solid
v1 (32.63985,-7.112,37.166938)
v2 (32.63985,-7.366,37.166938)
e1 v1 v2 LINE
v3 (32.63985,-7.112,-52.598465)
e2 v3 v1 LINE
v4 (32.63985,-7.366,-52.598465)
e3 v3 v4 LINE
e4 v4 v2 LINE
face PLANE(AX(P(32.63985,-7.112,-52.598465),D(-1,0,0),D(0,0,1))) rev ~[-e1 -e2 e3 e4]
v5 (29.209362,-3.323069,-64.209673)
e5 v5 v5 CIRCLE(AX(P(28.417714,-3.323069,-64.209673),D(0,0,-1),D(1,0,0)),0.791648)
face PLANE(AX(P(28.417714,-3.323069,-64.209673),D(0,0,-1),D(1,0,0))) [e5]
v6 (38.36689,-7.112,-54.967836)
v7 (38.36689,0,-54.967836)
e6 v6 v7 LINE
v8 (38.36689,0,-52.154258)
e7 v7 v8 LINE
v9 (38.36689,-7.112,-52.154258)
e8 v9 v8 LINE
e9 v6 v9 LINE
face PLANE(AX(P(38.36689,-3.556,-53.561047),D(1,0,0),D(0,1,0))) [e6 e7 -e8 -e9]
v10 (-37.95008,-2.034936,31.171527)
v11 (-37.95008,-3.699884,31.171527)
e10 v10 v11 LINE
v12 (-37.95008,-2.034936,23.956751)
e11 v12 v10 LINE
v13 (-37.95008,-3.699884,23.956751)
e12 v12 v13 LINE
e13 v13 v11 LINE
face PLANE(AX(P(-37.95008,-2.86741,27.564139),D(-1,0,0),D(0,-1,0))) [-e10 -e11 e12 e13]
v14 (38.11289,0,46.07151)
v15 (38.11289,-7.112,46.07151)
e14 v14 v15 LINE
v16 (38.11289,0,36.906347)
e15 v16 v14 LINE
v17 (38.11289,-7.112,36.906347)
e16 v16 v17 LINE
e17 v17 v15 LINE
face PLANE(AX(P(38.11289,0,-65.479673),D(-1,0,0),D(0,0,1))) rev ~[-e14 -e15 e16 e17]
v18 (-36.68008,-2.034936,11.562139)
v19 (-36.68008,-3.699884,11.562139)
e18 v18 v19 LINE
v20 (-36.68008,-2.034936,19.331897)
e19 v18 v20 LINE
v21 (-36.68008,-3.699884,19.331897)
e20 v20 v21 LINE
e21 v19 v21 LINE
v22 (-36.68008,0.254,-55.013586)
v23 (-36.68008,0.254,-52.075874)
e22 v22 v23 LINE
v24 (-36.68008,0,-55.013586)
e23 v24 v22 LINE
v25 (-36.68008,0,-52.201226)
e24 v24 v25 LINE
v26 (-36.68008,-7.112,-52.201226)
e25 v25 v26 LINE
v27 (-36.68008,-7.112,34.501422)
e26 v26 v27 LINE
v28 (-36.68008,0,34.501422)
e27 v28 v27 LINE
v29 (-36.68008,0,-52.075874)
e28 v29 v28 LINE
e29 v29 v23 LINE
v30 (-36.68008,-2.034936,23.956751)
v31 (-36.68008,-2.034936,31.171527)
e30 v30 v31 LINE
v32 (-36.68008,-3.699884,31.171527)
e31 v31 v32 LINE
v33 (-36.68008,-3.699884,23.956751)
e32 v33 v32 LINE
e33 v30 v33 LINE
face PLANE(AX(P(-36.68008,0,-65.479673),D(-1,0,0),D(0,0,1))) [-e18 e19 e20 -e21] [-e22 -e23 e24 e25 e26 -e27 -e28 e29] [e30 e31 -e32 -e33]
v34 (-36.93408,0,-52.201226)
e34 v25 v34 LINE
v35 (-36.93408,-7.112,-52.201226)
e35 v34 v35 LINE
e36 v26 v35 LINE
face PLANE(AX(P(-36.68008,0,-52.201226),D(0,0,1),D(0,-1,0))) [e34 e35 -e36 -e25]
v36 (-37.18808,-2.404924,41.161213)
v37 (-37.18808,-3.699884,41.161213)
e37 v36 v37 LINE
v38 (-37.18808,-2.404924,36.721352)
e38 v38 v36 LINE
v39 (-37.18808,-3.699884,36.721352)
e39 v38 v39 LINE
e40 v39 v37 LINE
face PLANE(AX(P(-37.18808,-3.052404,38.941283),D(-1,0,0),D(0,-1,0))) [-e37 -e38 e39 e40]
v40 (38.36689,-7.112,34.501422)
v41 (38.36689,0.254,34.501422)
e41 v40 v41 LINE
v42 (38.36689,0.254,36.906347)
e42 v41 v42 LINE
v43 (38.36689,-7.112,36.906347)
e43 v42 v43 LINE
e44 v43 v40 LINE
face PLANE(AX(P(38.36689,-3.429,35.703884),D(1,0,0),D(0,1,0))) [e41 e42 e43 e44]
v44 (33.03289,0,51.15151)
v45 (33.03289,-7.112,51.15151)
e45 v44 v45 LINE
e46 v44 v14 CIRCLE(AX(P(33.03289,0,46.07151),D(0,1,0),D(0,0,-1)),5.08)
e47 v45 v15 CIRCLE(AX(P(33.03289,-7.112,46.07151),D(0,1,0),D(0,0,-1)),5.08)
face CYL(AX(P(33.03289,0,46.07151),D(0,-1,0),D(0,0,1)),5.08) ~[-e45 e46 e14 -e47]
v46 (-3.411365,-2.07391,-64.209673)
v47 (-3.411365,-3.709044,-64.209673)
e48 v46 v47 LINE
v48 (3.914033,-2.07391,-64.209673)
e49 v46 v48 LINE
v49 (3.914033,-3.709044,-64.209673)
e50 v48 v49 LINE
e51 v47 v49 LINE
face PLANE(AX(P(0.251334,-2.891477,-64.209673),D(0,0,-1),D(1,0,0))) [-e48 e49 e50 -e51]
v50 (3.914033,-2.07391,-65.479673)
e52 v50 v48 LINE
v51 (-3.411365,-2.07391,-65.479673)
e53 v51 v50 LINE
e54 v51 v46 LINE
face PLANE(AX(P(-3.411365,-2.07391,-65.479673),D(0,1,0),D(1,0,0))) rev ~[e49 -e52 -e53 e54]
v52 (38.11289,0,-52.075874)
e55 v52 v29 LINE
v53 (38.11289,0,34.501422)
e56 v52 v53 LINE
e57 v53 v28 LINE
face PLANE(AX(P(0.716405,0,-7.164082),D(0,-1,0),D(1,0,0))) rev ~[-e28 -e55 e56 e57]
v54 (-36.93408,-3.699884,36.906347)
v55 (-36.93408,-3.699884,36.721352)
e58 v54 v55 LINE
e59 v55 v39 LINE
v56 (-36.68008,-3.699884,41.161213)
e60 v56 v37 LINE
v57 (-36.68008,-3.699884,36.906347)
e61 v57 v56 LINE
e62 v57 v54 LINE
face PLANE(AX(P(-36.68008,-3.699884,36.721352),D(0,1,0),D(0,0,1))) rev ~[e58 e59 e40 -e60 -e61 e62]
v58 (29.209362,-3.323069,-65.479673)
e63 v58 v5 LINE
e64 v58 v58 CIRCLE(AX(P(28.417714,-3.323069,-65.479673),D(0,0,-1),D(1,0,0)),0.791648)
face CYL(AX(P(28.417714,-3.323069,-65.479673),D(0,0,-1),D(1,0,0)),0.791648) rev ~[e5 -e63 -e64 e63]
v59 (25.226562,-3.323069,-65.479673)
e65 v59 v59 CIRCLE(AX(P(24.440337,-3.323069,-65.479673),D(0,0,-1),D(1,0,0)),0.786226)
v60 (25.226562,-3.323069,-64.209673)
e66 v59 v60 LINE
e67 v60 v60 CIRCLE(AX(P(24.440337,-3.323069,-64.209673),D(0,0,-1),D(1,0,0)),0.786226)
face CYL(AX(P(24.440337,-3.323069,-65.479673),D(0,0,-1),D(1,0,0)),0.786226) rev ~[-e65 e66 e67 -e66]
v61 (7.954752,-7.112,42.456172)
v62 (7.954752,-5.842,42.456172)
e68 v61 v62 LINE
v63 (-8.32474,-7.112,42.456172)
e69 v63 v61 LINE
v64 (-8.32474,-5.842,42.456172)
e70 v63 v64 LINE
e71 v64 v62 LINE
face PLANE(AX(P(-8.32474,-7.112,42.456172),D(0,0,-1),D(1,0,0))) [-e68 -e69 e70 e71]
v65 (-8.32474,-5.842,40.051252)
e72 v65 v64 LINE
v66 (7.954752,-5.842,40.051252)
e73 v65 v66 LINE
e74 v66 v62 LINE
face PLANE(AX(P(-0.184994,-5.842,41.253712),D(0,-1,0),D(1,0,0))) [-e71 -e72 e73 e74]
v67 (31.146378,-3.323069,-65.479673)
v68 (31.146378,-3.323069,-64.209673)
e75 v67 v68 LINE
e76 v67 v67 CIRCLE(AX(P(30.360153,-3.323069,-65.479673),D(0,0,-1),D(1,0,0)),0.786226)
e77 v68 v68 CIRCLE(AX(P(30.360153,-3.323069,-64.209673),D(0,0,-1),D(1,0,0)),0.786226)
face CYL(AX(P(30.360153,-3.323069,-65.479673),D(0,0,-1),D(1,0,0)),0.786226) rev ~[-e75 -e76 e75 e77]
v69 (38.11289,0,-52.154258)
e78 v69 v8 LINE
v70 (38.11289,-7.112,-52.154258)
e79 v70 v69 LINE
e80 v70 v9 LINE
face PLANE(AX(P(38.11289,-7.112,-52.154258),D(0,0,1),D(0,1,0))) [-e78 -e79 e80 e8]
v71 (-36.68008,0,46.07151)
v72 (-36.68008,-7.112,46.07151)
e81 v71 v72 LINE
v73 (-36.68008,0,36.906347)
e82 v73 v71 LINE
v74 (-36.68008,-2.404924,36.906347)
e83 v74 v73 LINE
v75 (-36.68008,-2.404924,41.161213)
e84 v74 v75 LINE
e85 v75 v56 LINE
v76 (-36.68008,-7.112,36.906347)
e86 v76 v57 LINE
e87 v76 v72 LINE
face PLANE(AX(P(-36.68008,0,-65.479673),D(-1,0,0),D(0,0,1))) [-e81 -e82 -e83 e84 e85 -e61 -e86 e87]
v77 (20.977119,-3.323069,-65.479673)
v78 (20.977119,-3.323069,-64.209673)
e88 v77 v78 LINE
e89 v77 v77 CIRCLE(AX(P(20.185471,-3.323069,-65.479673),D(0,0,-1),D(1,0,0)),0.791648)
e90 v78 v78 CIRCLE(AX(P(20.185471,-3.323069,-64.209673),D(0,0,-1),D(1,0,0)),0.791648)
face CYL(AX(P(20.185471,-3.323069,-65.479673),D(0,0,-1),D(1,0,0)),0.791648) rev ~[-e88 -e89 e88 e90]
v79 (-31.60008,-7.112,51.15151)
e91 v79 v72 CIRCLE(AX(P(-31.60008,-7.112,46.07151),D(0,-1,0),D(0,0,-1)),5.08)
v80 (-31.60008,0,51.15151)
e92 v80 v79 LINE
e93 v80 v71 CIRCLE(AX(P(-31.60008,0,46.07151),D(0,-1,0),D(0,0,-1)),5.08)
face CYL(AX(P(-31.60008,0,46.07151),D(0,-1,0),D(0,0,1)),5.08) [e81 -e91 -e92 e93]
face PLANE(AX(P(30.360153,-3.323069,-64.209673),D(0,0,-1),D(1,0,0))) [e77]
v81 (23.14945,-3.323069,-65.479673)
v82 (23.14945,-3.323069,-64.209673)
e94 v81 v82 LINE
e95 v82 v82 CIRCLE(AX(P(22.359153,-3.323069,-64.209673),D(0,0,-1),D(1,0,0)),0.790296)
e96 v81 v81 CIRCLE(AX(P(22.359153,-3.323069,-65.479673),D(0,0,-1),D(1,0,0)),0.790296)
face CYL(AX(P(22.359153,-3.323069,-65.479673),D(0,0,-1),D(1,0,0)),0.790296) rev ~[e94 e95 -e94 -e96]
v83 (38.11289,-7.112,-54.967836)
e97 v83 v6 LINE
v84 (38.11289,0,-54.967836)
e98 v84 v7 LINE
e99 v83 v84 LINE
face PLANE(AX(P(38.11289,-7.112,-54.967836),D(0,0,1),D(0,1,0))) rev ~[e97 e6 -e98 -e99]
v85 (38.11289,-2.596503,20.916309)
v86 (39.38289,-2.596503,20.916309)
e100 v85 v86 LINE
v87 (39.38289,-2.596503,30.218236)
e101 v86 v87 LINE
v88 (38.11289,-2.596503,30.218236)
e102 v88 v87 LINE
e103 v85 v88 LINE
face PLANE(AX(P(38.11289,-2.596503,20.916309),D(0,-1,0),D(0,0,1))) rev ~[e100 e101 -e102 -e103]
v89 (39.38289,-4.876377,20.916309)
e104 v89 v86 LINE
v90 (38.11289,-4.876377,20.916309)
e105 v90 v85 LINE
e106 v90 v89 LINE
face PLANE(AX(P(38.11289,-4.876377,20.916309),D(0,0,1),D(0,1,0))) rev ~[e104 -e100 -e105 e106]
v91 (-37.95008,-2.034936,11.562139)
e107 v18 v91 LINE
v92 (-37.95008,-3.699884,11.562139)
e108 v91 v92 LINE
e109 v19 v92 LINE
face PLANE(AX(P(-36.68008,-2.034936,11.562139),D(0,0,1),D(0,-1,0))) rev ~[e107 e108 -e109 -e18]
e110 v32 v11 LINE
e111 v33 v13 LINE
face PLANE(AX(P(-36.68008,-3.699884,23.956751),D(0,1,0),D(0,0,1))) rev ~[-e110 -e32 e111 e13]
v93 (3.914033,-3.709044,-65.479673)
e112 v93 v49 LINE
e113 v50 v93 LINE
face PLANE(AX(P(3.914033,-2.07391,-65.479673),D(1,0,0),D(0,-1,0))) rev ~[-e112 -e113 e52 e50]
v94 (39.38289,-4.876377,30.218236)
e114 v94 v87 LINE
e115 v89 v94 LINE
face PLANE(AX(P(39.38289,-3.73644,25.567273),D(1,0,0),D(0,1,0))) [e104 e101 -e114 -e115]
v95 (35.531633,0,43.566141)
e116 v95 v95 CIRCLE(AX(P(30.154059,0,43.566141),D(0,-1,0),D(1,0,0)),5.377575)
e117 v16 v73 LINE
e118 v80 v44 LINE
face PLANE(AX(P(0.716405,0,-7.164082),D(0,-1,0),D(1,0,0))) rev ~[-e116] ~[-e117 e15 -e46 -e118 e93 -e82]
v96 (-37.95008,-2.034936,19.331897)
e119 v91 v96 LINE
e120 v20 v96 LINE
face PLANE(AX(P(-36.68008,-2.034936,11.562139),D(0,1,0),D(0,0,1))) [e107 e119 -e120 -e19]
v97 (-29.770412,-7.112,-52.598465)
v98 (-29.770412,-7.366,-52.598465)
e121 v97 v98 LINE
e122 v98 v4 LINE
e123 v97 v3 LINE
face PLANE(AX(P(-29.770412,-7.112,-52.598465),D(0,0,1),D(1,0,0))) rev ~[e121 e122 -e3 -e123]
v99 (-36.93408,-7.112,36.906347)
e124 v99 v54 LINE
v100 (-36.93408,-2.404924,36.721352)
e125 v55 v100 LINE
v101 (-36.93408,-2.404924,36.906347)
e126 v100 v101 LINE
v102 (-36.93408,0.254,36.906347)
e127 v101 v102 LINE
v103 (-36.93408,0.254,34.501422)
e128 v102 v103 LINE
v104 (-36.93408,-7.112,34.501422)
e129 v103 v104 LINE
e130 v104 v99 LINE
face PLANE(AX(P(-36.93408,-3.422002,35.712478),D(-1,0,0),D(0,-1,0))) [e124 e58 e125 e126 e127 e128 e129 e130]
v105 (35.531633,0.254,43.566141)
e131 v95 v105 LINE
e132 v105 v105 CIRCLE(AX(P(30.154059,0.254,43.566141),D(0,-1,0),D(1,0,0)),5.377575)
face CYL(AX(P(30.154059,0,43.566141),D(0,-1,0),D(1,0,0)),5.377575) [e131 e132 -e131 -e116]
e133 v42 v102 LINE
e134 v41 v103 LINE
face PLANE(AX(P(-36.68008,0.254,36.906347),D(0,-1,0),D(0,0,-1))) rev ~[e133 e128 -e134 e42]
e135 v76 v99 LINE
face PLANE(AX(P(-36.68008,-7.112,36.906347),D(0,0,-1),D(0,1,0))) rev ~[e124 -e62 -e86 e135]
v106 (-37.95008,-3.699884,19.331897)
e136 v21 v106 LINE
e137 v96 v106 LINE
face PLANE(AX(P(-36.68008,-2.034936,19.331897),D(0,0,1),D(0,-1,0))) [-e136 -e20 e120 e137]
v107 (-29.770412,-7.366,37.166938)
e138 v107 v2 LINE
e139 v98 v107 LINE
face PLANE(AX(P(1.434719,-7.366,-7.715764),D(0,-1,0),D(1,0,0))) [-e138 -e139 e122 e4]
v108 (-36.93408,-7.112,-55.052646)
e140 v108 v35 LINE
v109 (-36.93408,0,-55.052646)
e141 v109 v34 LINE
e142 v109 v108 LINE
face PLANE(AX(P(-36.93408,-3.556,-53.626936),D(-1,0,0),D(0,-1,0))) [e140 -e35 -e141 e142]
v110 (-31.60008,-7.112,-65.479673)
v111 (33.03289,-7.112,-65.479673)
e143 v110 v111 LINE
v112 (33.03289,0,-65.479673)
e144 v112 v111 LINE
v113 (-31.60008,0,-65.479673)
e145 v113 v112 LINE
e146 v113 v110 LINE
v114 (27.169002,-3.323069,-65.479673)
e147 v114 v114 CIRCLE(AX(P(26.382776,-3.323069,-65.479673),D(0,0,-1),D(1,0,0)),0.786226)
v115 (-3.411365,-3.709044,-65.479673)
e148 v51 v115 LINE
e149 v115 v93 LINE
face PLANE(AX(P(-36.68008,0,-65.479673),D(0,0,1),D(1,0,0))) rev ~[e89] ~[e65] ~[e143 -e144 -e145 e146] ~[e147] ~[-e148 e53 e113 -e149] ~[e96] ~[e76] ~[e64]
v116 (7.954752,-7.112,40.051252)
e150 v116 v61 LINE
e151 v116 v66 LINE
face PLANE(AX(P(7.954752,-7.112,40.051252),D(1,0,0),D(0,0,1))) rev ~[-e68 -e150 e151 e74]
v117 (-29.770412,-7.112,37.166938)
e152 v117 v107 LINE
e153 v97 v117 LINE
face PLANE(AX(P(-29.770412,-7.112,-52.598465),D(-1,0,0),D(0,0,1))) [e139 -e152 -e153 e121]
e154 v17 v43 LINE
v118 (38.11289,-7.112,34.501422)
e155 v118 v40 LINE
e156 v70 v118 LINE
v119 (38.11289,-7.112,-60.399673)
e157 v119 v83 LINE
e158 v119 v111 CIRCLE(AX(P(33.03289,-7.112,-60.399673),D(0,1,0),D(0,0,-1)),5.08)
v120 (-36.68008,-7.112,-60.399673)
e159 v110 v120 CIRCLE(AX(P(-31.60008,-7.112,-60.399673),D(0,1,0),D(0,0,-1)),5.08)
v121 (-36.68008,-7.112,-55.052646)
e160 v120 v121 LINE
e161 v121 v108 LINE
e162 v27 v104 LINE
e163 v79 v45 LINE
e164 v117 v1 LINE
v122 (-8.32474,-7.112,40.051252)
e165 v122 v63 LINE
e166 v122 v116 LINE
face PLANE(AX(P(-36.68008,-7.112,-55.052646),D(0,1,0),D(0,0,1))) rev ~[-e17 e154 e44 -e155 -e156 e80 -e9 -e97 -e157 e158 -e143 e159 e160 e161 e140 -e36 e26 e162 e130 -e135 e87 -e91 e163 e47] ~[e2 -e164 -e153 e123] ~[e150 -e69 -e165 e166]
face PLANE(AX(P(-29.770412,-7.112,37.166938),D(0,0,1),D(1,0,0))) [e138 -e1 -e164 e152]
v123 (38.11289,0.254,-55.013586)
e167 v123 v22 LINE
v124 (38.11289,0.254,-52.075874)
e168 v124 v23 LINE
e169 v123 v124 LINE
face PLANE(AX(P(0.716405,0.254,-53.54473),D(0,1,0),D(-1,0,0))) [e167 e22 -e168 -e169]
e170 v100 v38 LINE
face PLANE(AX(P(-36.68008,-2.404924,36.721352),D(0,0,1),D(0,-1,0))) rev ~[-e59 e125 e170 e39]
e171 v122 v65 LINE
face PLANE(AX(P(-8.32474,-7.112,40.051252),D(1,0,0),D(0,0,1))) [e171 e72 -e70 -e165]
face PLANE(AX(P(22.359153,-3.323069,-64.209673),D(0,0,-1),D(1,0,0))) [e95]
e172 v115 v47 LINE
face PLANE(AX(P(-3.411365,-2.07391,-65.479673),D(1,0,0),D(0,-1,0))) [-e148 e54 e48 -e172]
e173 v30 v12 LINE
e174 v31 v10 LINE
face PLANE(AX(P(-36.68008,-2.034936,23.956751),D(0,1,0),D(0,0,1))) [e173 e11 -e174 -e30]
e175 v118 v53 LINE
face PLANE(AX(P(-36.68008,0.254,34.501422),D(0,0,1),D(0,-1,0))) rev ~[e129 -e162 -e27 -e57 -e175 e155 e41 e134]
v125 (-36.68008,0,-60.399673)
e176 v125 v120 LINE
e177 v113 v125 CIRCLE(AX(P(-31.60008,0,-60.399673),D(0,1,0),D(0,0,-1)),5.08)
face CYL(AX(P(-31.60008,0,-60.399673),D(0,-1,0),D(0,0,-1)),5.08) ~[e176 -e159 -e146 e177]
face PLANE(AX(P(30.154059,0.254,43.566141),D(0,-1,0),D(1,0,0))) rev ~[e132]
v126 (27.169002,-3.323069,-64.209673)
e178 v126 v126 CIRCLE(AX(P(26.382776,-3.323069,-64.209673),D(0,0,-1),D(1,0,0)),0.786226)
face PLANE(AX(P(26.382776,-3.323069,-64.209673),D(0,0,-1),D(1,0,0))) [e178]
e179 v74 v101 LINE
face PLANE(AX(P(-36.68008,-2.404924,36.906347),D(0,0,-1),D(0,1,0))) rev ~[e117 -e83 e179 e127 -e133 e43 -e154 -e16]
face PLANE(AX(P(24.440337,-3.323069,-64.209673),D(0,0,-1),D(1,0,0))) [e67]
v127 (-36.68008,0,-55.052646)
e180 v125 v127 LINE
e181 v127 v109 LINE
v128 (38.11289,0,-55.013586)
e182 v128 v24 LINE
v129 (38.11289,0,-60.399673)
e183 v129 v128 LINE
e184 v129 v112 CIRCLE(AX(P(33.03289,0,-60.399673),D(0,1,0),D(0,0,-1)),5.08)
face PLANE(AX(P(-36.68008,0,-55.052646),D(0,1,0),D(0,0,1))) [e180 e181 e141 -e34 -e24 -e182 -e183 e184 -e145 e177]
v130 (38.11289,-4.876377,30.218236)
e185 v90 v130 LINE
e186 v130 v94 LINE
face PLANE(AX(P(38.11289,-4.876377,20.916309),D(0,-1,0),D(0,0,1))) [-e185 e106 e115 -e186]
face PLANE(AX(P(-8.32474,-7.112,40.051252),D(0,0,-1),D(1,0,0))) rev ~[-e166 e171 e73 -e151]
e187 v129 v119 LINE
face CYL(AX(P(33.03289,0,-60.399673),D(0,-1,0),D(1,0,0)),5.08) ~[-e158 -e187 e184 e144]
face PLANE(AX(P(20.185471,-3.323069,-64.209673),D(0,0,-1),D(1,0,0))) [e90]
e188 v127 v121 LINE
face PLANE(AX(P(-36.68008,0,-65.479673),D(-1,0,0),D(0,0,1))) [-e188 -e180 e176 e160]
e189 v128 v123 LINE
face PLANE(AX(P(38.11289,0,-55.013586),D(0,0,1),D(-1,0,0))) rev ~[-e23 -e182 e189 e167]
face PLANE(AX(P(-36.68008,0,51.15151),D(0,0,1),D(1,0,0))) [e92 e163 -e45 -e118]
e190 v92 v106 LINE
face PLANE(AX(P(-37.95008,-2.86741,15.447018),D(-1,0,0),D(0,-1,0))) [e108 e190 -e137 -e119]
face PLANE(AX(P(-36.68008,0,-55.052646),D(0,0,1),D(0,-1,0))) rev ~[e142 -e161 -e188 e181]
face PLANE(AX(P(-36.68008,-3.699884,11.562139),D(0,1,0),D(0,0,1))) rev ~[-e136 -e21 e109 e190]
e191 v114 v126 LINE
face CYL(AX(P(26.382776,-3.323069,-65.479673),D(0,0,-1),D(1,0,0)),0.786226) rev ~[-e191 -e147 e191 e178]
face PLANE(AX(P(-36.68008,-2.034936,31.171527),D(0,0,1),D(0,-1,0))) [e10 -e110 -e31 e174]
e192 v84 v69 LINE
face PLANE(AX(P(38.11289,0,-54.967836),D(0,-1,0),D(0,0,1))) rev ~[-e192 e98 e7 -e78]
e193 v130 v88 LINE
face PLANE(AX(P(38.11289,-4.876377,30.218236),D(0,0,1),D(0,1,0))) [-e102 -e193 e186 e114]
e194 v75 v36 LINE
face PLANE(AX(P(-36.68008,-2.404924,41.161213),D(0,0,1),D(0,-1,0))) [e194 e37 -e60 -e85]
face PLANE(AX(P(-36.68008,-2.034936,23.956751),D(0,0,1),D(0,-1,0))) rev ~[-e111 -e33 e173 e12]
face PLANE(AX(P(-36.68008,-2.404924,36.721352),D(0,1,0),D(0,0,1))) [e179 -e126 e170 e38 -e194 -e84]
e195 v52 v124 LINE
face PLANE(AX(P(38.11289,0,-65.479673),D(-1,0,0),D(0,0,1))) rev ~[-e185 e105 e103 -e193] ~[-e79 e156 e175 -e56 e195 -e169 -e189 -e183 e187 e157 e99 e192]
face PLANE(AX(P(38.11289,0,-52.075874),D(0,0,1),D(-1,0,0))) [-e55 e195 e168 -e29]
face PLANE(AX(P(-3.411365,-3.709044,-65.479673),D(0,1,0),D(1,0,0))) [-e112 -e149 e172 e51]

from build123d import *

# Parameters (mm, degrees)
F0_W      = 74.7929699719
F0_H      = 116.6311837733
F1_DEPTH  = 7.112
F2_W      = 2.2798741702
F2_H      = 9.3019269407
F3_DEPTH  = 1.27
F4_W      = 1.6649477184
F4_H      = 7.7697578818
F5_DEPTH  = 1.27
F4_H_2    = 7.214775309
F6_DEPTH  = 1.27
F4_W_2    = 1.2949595693
F4_H_3    = 4.4398605824
F7_DEPTH  = 0.508
F10_W     = 16.2794925272
F10_H     = 2.4049207568
F11_DEPTH = 1.27
F14_R     = 5.08
F15_R     = 5.08
F16_W     = 62.410261482
F16_H     = 89.7654034197
F17_DEPTH = 0.254
F21_R     = 5.3775746227
F22_DEPTH = 0.254
F25_W     = 74.7929699719
F25_H     = 2.4049244821
F26_DEPTH = 0.254
F29_DEPTH = 0.254
F30_DEPTH = 0.254
F31_W     = 74.7929699719
F31_H     = 2.9377117753
F34_DEPTH = 0.254
F32_W     = 7.112
F32_H     = 2.813577652
F35_DEPTH = 0.254
F33_W     = 7.112
F33_H     = 2.8514191508
F36_DEPTH = 0.254
F8_R      = 0.7916480681
F39_DEPTH = 1.27
F9_R      = 0.7862255443
F9_R_2    = 0.7916480681
F9_R_3    = 0.7862255169
F9_R_4    = 0.7902964021
F40_DEPTH = 1.27
F41_W     = 7.3253975715
F41_H     = 1.6351337545
F42_DEPTH = 1.27


# Not quite as in the source:
# - the program builds the solid bodies; features that only make, move or delete a surface that nothing else refers to are left out


with BuildPart() as f1:
    # F0 (on Front) → F1 (new body)
    with BuildSketch(Plane.XZ):
        with Locations((0.7164049894, -7.1640815586)):
            Rectangle(F0_W, F0_H)
    extrude(amount=F1_DEPTH)

    # F2 (on face) → F3 (join)
    with BuildSketch(Plane.YZ.offset(38.1128899753)):
        with Locations((-3.7364399759, 25.567272678)):
            Rectangle(F2_W, F2_H)
    extrude(amount=F3_DEPTH)

    # F4 (on face) → F5 (join)
    with BuildSketch(Plane(origin=(-36.6800799966, 0, 0), x_dir=(0, -1, 0), z_dir=(-1, 0, 0))):
        with Locations((2.8674099594, 15.4470177367)):
            Rectangle(F4_W, F4_H)
    extrude(amount=F5_DEPTH)

    # F4 (on face) → F6 (join)
    with BuildSketch(Plane(origin=(-36.6800799966, 0, 0), x_dir=(0, -1, 0), z_dir=(-1, 0, 0))):
        with Locations((2.8674099594, 27.5641391054)):
            Rectangle(F4_W, F4_H_2)
    extrude(amount=F6_DEPTH)

    # F4 (on face) → F7 (join)
    with BuildSketch(Plane(origin=(-36.6800799966, 0, 0), x_dir=(0, -1, 0), z_dir=(-1, 0, 0))):
        with Locations((3.052404034, 38.941282779)):
            Rectangle(F4_W_2, F4_H_3)
    extrude(amount=F7_DEPTH)

    # F10 (on face) → F11 (cut)
    with BuildSketch(Plane.XZ.offset(7.112)):
        with Locations((-0.1849941909, 41.2537120283)):
            Rectangle(F10_W, F10_H)
    extrude(amount=-F11_DEPTH, mode=Mode.SUBTRACT)

    # F14
    f14_edges = [f1.edges().sort_by_distance(p)[0] for p in [
        (38.11289, -3.556, 51.15151),
    ]]
    fillet(f14_edges, radius=F14_R)

    # F15
    f15_edges = [f1.edges().sort_by_distance(p)[0] for p in [
        (-36.68008, -3.556, 51.15151),
        (-36.68008, -3.556, -65.479673),
        (38.11289, -3.556, -65.479673),
    ]]
    fillet(f15_edges, radius=F15_R)

    # F16 (on face) → F17 (join)
    with BuildSketch(Plane.XZ.offset(7.112)):
        with Locations((1.43471919, -7.7157635242)):
            Rectangle(F16_W, F16_H)
    extrude(amount=F17_DEPTH)

    # F21 (on Front) → F22 (join)
    with BuildSketch(Plane.XZ):
        with Locations((30.1540587097, 43.5661412776)):
            Circle(F21_R)
    extrude(amount=-F22_DEPTH)

    # F25 (on face) → F26 (join)
    with BuildSketch(Plane(origin=(0, 0, 0), x_dir=(-1, 0, 0), z_dir=(0, 1, 0))):
        with Locations((-0.7164049894, 35.7038844377)):
            Rectangle(F25_W, F25_H)
    extrude(amount=F26_DEPTH)

    # F27 (on face) → F29 (join)
    with BuildSketch(Plane.YZ.offset(38.1128899753)):
        Polygon((0.254, 34.5014221966), (0.254, 36.9063466787), (0, 36.9063466787), (-7.112, 36.9063466787), (-7.112, 34.5014221966), (0, 34.5014221966), align=None)
    extrude(amount=F29_DEPTH)

    # F28 (on face) → F30 (join)
    with BuildSketch(Plane(origin=(-36.6800799966, 0, 0), x_dir=(0, -1, 0), z_dir=(-1, 0, 0))):
        Polygon((2.4049242493, 36.9063466787), (0, 36.9063466787), (-0.254, 36.9063466787), (-0.254, 34.5014221966), (0, 34.5014221966), (7.112, 34.5014221966), (7.112, 36.9063466787), (3.6998838186, 36.9063466787), (3.6998838186, 36.7213524878), (2.4049242493, 36.7213524878), align=None)
    extrude(amount=F30_DEPTH)

    # F31 (on face) → F34 (join)
    with BuildSketch(Plane(origin=(0, 0, 0), x_dir=(-1, 0, 0), z_dir=(0, 1, 0))):
        with Locations((-0.7164049894, -53.544729948)):
            Rectangle(F31_W, F31_H)
    extrude(amount=F34_DEPTH)

    # F32 (on face) → F35 (join)
    with BuildSketch(Plane.YZ.offset(38.1128899753)):
        with Locations((-3.556, -53.5610467196)):
            Rectangle(F32_W, F32_H)
    extrude(amount=F35_DEPTH)

    # F33 (on face) → F36 (join)
    with BuildSketch(Plane(origin=(-36.6800799966, 0, 0), x_dir=(0, -1, 0), z_dir=(-1, 0, 0))):
        with Locations((3.556, -53.6269359291)):
            Rectangle(F33_W, F33_H)
    extrude(amount=F36_DEPTH)

    # F8 (on face) → F39 (cut)
    with BuildSketch(Plane(origin=(0, 0, -65.4796734452), x_dir=(1, 0, 0), z_dir=(0, 0, -1))):
        with Locations((20.1854705811, 3.3230686095)):
            Circle(F8_R)
    extrude(amount=-F39_DEPTH, mode=Mode.SUBTRACT)

    # F9 (on face) → F40 (cut)
    with BuildSketch(Plane(origin=(0, 0, -65.4796734452), x_dir=(1, 0, 0), z_dir=(0, 0, -1))):
        with Locations((30.3601529449, 3.3230686095)):
            Circle(F9_R)
        with Locations((28.4177139401, 3.3230686095)):
            Circle(F9_R_2)
        with Locations((26.3827759773, 3.3230686095)):
            Circle(F9_R)
        with Locations((24.4403369725, 3.3230686095)):
            Circle(F9_R_3)
        with Locations((22.3591532558, 3.3230686095)):
            Circle(F9_R_4)
    extrude(amount=-F40_DEPTH, mode=Mode.SUBTRACT)

    # F41 (on face) → F42 (cut)
    with BuildSketch(Plane(origin=(0, 0, -65.4796734452), x_dir=(1, 0, 0), z_dir=(0, 0, -1))):
        with Locations((0.251334277, 2.8914771974)):
            Rectangle(F41_W, F41_H)
    extrude(amount=-F42_DEPTH, mode=Mode.SUBTRACT)


solid = f1.part
